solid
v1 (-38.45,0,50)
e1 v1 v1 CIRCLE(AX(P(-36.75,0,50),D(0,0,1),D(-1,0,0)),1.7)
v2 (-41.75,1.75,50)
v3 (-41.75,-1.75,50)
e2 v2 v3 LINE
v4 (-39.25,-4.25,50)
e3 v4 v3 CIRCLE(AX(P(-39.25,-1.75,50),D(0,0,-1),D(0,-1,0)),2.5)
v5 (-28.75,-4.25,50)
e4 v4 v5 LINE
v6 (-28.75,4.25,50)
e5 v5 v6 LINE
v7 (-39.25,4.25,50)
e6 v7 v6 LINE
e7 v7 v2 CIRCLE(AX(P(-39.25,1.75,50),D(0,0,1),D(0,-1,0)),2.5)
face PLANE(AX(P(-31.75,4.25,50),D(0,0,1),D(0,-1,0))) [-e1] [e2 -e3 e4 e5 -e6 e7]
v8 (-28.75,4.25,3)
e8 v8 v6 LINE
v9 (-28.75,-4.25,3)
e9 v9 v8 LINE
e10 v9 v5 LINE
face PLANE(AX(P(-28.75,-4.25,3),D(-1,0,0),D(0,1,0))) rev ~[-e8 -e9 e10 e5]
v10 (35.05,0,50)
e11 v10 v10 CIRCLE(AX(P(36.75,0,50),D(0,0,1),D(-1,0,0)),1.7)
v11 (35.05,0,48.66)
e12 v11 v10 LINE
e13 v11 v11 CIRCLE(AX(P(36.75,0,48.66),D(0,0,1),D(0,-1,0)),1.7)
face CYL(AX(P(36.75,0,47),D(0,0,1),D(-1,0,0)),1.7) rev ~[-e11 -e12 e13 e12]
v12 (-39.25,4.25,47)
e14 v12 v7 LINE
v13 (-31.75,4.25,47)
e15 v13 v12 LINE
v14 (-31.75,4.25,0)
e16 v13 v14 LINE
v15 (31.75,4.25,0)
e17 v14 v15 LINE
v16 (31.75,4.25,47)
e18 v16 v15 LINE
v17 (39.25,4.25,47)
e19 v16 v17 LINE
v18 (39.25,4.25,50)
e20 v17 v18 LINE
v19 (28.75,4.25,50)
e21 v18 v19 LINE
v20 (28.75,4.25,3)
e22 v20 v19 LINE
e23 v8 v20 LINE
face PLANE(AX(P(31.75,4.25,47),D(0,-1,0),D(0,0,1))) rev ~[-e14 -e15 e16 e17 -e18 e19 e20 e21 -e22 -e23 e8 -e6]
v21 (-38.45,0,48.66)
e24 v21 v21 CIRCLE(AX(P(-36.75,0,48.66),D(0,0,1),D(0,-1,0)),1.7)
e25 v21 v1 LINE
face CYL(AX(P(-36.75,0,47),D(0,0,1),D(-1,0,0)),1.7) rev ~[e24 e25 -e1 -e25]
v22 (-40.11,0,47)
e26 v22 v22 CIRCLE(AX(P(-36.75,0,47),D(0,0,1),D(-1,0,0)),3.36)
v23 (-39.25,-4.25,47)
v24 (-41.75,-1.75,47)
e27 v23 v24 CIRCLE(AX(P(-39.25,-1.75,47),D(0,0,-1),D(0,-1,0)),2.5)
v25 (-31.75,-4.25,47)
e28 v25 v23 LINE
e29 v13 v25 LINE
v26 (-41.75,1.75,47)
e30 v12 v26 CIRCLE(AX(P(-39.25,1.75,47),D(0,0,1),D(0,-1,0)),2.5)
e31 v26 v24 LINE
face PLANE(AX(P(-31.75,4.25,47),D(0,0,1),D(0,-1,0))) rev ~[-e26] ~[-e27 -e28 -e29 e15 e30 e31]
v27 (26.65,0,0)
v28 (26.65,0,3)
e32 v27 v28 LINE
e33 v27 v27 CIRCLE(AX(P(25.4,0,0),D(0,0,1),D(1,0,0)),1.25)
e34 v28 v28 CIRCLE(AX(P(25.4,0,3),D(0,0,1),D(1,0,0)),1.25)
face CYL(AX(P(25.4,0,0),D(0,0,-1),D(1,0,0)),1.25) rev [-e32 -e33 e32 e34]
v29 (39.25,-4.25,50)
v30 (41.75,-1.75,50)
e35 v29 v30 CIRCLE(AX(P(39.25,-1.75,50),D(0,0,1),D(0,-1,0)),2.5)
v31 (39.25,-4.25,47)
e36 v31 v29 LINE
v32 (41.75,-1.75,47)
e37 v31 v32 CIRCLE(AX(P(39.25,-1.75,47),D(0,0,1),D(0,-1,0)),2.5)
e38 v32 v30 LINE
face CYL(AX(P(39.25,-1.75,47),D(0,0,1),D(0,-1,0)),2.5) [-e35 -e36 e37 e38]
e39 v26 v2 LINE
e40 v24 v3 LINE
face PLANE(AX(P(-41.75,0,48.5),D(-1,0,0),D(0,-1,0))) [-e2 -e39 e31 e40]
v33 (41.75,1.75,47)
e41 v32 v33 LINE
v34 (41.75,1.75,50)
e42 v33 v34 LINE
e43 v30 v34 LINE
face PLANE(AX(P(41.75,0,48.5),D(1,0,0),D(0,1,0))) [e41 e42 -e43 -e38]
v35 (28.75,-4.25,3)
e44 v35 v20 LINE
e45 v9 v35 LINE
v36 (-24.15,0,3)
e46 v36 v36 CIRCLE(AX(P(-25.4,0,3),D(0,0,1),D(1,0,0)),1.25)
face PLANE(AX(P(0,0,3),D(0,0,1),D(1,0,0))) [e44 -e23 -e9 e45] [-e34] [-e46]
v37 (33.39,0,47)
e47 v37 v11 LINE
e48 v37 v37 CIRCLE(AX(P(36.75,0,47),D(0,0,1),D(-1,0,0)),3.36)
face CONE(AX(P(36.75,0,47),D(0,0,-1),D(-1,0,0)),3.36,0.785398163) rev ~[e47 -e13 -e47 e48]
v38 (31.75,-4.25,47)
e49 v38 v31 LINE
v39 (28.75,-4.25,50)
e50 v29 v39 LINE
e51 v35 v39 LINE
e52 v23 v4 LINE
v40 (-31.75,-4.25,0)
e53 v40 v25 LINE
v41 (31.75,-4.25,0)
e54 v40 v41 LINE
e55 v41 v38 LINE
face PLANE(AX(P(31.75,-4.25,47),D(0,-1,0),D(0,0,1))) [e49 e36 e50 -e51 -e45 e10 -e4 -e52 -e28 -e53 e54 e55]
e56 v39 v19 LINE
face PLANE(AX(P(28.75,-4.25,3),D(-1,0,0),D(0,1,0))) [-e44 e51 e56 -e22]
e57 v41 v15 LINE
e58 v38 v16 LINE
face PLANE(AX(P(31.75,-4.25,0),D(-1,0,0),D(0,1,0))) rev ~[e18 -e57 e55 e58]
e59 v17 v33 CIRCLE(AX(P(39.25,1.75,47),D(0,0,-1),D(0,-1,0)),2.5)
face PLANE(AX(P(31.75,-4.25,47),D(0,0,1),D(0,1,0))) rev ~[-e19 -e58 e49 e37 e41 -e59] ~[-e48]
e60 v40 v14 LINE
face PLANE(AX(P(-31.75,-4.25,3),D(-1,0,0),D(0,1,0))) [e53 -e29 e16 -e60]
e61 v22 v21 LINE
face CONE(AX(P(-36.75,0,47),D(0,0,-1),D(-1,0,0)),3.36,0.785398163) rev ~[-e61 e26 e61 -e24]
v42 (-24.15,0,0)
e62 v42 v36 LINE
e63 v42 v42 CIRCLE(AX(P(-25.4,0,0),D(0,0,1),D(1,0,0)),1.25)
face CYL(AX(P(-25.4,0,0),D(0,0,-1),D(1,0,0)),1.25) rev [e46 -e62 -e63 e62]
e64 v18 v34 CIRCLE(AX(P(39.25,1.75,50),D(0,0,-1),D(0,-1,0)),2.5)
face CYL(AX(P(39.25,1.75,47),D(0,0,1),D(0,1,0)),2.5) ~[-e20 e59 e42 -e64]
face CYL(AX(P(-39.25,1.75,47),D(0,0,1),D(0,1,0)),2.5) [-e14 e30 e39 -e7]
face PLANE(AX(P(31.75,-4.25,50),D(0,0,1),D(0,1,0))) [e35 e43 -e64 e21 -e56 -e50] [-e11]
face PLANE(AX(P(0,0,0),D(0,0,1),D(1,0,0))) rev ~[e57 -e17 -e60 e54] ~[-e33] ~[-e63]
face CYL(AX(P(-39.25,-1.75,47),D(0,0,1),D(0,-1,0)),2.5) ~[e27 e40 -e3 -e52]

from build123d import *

# Parameters (mm, degrees)
F0_W            = 63.5
F0_H            = 8.5
F0_R            = 1.25
F1_DEPTH        = 3
F2_W            = 3
F2_H            = 8.5
F3_DEPTH        = 47
F4_W            = 8.5
F4_H            = 3
F5_DEPTH        = 10
F6_W            = 8.5
F6_H            = 3
F7_DEPTH        = 10
F9_D            = 3.4
F9_DEPTH        = 5
F9_CSINK_D      = 6.72
F9_CSINK_ANGLE  = 90
F9_TIP          = 1.0214630523
F11_D           = 3.4
F11_DEPTH       = 5
F11_CSINK_D     = 6.72
F11_CSINK_ANGLE = 90
F11_TIP         = 1.0214630523
F12_R           = 2.5


with BuildPart() as f1:
    # F0 (on Top) → F1 (new body)
    with BuildSketch(Plane.XY):
        Rectangle(F0_W, F0_H)
        with Locations((-25.4, 0)):
            Circle(F0_R, mode=Mode.SUBTRACT)
        with Locations((25.4, 0)):
            Circle(F0_R, mode=Mode.SUBTRACT)
    extrude(amount=F1_DEPTH)

    # F2 (on face) → F3 (join)
    with BuildSketch(Plane.XY.offset(3)):
        with Locations((-30.25, 0)):
            Rectangle(F2_W, F2_H)
        with Locations((30.25, 0)):
            Rectangle(F2_W, F2_H)
    extrude(amount=F3_DEPTH)

    # F4 (on face) → F5 (join)
    with BuildSketch(Plane(origin=(-31.75, 0, 0), x_dir=(0, -1, 0), z_dir=(-1, 0, 0))):
        with Locations((0, 48.5)):
            Rectangle(F4_W, F4_H)
    extrude(amount=F5_DEPTH)

    # F6 (on face) → F7 (join)
    with BuildSketch(Plane.YZ.offset(31.75)):
        with Locations((0, 48.5)):
            Rectangle(F6_W, F6_H)
    extrude(amount=F7_DEPTH)

    # F9
    with Locations(Plane(origin=(0, 0, 47), x_dir=(1, 0, 0), z_dir=(0, 0, -1))):
        with Locations((-36.75, 0)):
            CounterSinkHole(F9_D / 2, F9_CSINK_D / 2, depth=F9_DEPTH, counter_sink_angle=F9_CSINK_ANGLE)
            with Locations((0, 0, -(F9_DEPTH + F9_TIP / 2))):  # 118° drill point
                Cone(0, F9_D / 2, F9_TIP, mode=Mode.SUBTRACT)

    # F11
    with Locations(Plane(origin=(0, 0, 47), x_dir=(1, 0, 0), z_dir=(0, 0, -1))):
        with Locations((36.75, 0)):
            CounterSinkHole(F11_D / 2, F11_CSINK_D / 2, depth=F11_DEPTH, counter_sink_angle=F11_CSINK_ANGLE)
            with Locations((0, 0, -(F11_DEPTH + F11_TIP / 2))):  # 118° drill point
                Cone(0, F11_D / 2, F11_TIP, mode=Mode.SUBTRACT)

    # F12
    f12_edges = [f1.edges().sort_by_distance(p)[0] for p in [
        (41.75, 4.25, 48.5),
        (41.75, -4.25, 48.5),
        (-41.75, 4.25, 48.5),
        (-41.75, -4.25, 48.5),
    ]]
    fillet(f12_edges, radius=F12_R)


solid = f1.part
